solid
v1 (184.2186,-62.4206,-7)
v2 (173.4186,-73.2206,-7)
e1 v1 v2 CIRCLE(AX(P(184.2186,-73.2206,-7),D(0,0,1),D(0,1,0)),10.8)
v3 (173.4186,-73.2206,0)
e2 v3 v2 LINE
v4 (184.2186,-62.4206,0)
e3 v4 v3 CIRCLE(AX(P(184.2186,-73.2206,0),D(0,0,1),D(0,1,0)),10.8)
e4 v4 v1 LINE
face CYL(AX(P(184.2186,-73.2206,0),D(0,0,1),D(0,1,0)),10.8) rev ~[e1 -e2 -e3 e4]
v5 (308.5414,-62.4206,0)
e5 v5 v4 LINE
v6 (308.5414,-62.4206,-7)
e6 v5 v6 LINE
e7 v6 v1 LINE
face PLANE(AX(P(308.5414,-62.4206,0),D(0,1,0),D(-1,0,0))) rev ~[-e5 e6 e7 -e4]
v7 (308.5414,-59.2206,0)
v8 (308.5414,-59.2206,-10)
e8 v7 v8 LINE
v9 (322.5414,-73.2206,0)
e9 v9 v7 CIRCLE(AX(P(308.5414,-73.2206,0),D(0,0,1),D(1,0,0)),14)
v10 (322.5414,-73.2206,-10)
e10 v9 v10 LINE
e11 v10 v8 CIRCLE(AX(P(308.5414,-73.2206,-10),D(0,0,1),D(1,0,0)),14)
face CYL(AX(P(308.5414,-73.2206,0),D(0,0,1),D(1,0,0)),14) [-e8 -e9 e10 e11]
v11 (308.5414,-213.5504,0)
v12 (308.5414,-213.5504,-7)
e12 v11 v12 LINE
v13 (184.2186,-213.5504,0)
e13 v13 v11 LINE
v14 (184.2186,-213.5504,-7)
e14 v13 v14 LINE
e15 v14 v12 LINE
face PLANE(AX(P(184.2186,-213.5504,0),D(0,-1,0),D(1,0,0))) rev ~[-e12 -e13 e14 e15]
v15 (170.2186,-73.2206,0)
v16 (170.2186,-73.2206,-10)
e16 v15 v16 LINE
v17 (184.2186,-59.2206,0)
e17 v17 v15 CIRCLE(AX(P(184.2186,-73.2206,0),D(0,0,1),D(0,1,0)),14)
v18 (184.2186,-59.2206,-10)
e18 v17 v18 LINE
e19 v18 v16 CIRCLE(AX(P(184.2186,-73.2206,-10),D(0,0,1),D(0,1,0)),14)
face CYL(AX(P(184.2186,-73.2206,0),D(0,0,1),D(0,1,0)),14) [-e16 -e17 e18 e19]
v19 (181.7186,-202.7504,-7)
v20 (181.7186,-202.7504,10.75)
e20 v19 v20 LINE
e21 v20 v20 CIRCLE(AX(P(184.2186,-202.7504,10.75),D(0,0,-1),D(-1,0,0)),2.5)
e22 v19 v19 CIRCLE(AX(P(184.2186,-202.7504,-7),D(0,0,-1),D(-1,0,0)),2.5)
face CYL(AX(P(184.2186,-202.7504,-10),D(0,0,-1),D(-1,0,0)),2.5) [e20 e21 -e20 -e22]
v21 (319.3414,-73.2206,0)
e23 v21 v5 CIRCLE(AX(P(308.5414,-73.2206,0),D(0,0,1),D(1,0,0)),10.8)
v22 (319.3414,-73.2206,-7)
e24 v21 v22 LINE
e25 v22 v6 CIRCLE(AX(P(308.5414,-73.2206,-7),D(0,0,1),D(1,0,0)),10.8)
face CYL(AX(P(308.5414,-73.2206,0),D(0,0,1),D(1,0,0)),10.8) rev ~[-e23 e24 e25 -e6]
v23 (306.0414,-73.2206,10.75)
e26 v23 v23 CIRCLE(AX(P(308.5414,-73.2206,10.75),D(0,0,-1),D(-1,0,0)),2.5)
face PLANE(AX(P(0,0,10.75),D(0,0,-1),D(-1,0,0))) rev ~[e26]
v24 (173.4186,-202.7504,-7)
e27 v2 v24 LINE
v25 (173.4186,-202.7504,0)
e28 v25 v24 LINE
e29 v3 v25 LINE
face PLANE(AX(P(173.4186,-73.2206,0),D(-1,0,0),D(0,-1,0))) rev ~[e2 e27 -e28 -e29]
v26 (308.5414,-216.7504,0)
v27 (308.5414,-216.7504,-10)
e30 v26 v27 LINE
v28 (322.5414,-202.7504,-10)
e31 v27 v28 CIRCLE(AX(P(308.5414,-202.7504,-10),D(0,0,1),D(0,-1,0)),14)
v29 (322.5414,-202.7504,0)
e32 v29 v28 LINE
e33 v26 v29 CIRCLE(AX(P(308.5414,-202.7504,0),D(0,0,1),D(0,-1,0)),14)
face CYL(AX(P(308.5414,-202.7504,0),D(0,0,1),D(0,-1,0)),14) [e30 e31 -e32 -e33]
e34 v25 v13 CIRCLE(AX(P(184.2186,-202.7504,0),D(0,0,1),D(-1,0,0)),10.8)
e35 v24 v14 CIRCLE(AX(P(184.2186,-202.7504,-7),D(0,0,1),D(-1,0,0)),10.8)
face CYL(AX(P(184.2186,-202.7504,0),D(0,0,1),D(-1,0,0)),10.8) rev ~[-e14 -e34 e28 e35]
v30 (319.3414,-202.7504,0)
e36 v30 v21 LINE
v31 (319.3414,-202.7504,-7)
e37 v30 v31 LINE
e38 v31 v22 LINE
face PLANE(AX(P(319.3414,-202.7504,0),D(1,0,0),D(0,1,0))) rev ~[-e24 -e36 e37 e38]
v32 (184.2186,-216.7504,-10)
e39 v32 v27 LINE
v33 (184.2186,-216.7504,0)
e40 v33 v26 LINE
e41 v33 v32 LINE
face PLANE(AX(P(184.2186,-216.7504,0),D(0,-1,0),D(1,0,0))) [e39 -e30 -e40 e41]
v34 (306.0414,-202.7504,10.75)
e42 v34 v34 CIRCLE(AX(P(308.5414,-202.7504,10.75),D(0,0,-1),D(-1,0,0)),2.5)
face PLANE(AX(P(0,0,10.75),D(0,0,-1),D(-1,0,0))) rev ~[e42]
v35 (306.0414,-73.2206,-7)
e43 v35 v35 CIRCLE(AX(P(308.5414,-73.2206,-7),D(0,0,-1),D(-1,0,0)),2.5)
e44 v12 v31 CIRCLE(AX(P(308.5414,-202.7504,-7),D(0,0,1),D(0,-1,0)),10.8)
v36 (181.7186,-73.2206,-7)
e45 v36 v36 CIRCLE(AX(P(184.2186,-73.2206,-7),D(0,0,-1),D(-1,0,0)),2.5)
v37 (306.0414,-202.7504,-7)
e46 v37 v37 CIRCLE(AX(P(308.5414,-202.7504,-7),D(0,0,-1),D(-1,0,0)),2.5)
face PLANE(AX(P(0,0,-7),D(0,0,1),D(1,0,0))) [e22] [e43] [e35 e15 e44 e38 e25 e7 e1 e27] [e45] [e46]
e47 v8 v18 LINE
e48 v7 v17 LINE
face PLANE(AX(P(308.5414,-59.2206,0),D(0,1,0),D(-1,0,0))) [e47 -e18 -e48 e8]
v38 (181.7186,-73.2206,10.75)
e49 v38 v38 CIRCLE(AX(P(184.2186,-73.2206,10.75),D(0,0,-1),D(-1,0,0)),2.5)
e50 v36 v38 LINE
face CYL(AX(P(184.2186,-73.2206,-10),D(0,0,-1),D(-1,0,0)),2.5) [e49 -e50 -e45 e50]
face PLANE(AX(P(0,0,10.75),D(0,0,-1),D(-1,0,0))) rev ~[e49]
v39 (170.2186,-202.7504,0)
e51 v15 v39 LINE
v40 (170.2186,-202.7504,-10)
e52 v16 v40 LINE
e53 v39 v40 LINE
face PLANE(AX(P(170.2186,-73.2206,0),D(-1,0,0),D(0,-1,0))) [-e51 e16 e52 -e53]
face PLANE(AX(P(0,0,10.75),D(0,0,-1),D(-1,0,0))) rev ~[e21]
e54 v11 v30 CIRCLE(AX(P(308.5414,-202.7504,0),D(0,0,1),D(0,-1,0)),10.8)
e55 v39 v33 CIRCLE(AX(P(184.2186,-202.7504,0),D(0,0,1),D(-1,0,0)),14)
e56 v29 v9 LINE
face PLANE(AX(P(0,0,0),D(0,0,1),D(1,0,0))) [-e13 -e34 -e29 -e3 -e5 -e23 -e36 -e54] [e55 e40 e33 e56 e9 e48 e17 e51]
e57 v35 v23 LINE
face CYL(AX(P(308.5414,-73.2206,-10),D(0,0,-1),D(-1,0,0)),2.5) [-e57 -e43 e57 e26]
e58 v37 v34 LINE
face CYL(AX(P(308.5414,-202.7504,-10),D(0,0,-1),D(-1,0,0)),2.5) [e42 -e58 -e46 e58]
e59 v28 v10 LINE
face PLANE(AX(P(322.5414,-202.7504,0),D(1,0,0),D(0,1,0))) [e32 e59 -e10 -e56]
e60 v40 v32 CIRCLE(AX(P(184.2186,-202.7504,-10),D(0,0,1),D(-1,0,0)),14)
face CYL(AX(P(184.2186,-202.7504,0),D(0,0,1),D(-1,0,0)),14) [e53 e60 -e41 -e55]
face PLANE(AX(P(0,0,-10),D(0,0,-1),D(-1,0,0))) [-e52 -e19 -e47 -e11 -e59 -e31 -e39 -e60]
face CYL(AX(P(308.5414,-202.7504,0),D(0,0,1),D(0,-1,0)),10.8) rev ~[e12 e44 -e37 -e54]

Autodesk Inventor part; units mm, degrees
ref_plane "YZ Plane" through (0, 0, 0) normal (1, 0, 0) x (0, 1, 0)
ref_plane "XZ Plane" through (0, 0, 0) normal (0, 1, 0) x (-1, 0, 0)
ref_plane "XY Plane" through (0, 0, 0) normal (0, 0, 1) x (1, 0, 0)
ref_plane "Work Plane2" through (0, 0, 0) normal (0, 0, 1) x (1, 0, 0)
sketch "Sketch2" plane through (0, 0, 0) normal (0, 0, 1) x (1, 0, 0)
  line L0 (174.2186, -202.7504) -> (174.2186, -73.2206) projected
  arc A0 (184.2186, -63.2206) -> (174.2186, -73.2206) centre (184.2186, -73.2206) ccw projected
  circle A1 centre (184.2186, -73.2206) radius 3 projected
  line L1 (184.2186, -63.2206) -> (308.5414, -63.2206) projected
  circle A2 centre (308.5414, -73.2206) radius 3 projected
  arc A3 (318.5414, -73.2206) -> (308.5414, -63.2206) centre (308.5414, -73.2206) ccw projected
  line L2 (318.5414, -73.2206) -> (318.5414, -202.7504) projected
  arc A4 (308.5414, -212.7504) -> (318.5414, -202.7504) centre (308.5414, -202.7504) ccw projected
  line L3 (308.5414, -212.7504) -> (184.2186, -212.7504) projected
  arc A5 (174.2186, -202.7504) -> (184.2186, -212.7504) centre (184.2186, -202.7504) ccw projected
  circle A6 centre (184.2186, -202.7504) radius 3 projected
  circle A7 centre (308.5414, -202.7504) radius 3 projected
  line L4 (308.5414, -59.2206) -> (184.2186, -59.2206)
  arc A8 (184.2186, -59.2206) -> (170.2186, -73.2206) centre (184.2186, -73.2206) ccw
  line L5 (170.2186, -73.2206) -> (170.2186, -202.7504)
  arc A9 (170.2186, -202.7504) -> (184.2186, -216.7504) centre (184.2186, -202.7504) ccw
  line L6 (184.2186, -216.7504) -> (308.5414, -216.7504)
  arc A10 (308.5414, -216.7504) -> (322.5414, -202.7504) centre (308.5414, -202.7504) ccw
  line L7 (322.5414, -202.7504) -> (322.5414, -73.2206)
  arc A11 (322.5414, -73.2206) -> (308.5414, -59.2206) centre (308.5414, -73.2206) ccw
  arc A12 (184.2186, -63.7206) -> (174.7186, -73.2206) centre (184.2186, -73.2206) ccw
  point P0 (0, 0)
  dimension "d8" = 4
ref_plane "Work Plane3" through (0, 0, 0) normal (0, 0, 1) x (1, 0, 0)
extrude "Extrusion3" add sketch "Sketch2" against normal blind 10 contours L0 A0 L1 A3 L2 A4 L3 A5 | A11 L7 A10 L6 A9 L5 A8 L4
sketch "Sketch4" plane through (0, 0, 0) normal (0, 0, 1) x (1, 0, 0)
  circle A0 centre (308.5414, -202.7504) radius 3 projected
  circle A1 centre (184.2186, -202.7504) radius 3 projected
  circle A2 centre (308.5414, -73.2206) radius 3 projected
  circle A3 centre (184.2186, -73.2206) radius 3 projected
  arc A4 (184.2186, -59.2206) -> (170.2186, -73.2206) centre (184.2186, -73.2206) ccw projected
  line L0 (170.2186, -73.2206) -> (170.2186, -202.7504) projected
  arc A5 (170.2186, -202.7504) -> (184.2186, -216.7504) centre (184.2186, -202.7504) ccw projected
  line L1 (184.2186, -216.7504) -> (308.5414, -216.7504) projected
  arc A6 (308.5414, -216.7504) -> (322.5414, -202.7504) centre (308.5414, -202.7504) ccw projected
  line L2 (322.5414, -202.7504) -> (322.5414, -73.2206) projected
  arc A7 (322.5414, -73.2206) -> (308.5414, -59.2206) centre (308.5414, -73.2206) ccw projected
  line L3 (308.5414, -59.2206) -> (184.2186, -59.2206) projected
  arc A8 (184.2186, -62.4206) -> (173.4186, -73.2206) centre (184.2186, -73.2206) ccw
  line L4 (173.4186, -73.2206) -> (173.4186, -202.7504)
  arc A9 (173.4186, -202.7504) -> (184.2186, -213.5504) centre (184.2186, -202.7504) ccw
  line L5 (184.2186, -213.5504) -> (308.5414, -213.5504)
  arc A10 (308.5414, -213.5504) -> (319.3414, -202.7504) centre (308.5414, -202.7504) ccw
  line L6 (319.3414, -202.7504) -> (319.3414, -73.2206)
  arc A11 (319.3414, -73.2206) -> (308.5414, -62.4206) centre (308.5414, -73.2206) ccw
  line L7 (308.5414, -62.4206) -> (184.2186, -62.4206)
  point P0 (0, 0)
  dimension "d10" = 3.2
extrude "Extrusion4" cut sketch "Sketch4" against normal blind 7 contours L7 A11 L6 A10 L5 A9 L4 A8
sketch "Sketch5" plane through (0, 0, -10) normal (0, 0, -1) x (-1, 0, 0)
  circle A0 centre (-308.5414, -202.7504) radius 3 projected
  circle A1 centre (-184.2186, -202.7504) radius 3 projected
  circle A2 centre (-308.5414, -73.2206) radius 3 projected
  circle A3 centre (-184.2186, -73.2206) radius 3 projected
  circle A4 centre (-308.5414, -73.2206) radius 2.5
  circle A5 centre (-184.2186, -73.2206) radius 2.5
  circle A6 centre (-184.2186, -202.7504) radius 2.5
  circle A7 centre (-308.5414, -202.7504) radius 2.5
  point P0 (0, 0)
  dimension "d15" = 0.5
  dimension "d16" = 0.5
  dimension "d17" = 0.5
  dimension "d18" = 0.5
extrude "Extrusion5" add sketch "Sketch5" against normal up to surface (3 mm away)
sketch "Sketch6" plane through (0, 0, -10) normal (0, 0, -1) x (-1, 0, 0)
  circle A0 centre (-184.2186, -202.7504) radius 2.5 projected
  circle A1 centre (-308.5414, -73.2206) radius 2.5 projected
  circle A2 centre (-308.5414, -202.7504) radius 2.5 projected
  circle A3 centre (-184.2186, -73.2206) radius 2.5 projected
  point P0 (0, 0)
extrude "Extrusion6" add sketch "Sketch6" against normal blind 20.75
properties part number "Part_atas"
